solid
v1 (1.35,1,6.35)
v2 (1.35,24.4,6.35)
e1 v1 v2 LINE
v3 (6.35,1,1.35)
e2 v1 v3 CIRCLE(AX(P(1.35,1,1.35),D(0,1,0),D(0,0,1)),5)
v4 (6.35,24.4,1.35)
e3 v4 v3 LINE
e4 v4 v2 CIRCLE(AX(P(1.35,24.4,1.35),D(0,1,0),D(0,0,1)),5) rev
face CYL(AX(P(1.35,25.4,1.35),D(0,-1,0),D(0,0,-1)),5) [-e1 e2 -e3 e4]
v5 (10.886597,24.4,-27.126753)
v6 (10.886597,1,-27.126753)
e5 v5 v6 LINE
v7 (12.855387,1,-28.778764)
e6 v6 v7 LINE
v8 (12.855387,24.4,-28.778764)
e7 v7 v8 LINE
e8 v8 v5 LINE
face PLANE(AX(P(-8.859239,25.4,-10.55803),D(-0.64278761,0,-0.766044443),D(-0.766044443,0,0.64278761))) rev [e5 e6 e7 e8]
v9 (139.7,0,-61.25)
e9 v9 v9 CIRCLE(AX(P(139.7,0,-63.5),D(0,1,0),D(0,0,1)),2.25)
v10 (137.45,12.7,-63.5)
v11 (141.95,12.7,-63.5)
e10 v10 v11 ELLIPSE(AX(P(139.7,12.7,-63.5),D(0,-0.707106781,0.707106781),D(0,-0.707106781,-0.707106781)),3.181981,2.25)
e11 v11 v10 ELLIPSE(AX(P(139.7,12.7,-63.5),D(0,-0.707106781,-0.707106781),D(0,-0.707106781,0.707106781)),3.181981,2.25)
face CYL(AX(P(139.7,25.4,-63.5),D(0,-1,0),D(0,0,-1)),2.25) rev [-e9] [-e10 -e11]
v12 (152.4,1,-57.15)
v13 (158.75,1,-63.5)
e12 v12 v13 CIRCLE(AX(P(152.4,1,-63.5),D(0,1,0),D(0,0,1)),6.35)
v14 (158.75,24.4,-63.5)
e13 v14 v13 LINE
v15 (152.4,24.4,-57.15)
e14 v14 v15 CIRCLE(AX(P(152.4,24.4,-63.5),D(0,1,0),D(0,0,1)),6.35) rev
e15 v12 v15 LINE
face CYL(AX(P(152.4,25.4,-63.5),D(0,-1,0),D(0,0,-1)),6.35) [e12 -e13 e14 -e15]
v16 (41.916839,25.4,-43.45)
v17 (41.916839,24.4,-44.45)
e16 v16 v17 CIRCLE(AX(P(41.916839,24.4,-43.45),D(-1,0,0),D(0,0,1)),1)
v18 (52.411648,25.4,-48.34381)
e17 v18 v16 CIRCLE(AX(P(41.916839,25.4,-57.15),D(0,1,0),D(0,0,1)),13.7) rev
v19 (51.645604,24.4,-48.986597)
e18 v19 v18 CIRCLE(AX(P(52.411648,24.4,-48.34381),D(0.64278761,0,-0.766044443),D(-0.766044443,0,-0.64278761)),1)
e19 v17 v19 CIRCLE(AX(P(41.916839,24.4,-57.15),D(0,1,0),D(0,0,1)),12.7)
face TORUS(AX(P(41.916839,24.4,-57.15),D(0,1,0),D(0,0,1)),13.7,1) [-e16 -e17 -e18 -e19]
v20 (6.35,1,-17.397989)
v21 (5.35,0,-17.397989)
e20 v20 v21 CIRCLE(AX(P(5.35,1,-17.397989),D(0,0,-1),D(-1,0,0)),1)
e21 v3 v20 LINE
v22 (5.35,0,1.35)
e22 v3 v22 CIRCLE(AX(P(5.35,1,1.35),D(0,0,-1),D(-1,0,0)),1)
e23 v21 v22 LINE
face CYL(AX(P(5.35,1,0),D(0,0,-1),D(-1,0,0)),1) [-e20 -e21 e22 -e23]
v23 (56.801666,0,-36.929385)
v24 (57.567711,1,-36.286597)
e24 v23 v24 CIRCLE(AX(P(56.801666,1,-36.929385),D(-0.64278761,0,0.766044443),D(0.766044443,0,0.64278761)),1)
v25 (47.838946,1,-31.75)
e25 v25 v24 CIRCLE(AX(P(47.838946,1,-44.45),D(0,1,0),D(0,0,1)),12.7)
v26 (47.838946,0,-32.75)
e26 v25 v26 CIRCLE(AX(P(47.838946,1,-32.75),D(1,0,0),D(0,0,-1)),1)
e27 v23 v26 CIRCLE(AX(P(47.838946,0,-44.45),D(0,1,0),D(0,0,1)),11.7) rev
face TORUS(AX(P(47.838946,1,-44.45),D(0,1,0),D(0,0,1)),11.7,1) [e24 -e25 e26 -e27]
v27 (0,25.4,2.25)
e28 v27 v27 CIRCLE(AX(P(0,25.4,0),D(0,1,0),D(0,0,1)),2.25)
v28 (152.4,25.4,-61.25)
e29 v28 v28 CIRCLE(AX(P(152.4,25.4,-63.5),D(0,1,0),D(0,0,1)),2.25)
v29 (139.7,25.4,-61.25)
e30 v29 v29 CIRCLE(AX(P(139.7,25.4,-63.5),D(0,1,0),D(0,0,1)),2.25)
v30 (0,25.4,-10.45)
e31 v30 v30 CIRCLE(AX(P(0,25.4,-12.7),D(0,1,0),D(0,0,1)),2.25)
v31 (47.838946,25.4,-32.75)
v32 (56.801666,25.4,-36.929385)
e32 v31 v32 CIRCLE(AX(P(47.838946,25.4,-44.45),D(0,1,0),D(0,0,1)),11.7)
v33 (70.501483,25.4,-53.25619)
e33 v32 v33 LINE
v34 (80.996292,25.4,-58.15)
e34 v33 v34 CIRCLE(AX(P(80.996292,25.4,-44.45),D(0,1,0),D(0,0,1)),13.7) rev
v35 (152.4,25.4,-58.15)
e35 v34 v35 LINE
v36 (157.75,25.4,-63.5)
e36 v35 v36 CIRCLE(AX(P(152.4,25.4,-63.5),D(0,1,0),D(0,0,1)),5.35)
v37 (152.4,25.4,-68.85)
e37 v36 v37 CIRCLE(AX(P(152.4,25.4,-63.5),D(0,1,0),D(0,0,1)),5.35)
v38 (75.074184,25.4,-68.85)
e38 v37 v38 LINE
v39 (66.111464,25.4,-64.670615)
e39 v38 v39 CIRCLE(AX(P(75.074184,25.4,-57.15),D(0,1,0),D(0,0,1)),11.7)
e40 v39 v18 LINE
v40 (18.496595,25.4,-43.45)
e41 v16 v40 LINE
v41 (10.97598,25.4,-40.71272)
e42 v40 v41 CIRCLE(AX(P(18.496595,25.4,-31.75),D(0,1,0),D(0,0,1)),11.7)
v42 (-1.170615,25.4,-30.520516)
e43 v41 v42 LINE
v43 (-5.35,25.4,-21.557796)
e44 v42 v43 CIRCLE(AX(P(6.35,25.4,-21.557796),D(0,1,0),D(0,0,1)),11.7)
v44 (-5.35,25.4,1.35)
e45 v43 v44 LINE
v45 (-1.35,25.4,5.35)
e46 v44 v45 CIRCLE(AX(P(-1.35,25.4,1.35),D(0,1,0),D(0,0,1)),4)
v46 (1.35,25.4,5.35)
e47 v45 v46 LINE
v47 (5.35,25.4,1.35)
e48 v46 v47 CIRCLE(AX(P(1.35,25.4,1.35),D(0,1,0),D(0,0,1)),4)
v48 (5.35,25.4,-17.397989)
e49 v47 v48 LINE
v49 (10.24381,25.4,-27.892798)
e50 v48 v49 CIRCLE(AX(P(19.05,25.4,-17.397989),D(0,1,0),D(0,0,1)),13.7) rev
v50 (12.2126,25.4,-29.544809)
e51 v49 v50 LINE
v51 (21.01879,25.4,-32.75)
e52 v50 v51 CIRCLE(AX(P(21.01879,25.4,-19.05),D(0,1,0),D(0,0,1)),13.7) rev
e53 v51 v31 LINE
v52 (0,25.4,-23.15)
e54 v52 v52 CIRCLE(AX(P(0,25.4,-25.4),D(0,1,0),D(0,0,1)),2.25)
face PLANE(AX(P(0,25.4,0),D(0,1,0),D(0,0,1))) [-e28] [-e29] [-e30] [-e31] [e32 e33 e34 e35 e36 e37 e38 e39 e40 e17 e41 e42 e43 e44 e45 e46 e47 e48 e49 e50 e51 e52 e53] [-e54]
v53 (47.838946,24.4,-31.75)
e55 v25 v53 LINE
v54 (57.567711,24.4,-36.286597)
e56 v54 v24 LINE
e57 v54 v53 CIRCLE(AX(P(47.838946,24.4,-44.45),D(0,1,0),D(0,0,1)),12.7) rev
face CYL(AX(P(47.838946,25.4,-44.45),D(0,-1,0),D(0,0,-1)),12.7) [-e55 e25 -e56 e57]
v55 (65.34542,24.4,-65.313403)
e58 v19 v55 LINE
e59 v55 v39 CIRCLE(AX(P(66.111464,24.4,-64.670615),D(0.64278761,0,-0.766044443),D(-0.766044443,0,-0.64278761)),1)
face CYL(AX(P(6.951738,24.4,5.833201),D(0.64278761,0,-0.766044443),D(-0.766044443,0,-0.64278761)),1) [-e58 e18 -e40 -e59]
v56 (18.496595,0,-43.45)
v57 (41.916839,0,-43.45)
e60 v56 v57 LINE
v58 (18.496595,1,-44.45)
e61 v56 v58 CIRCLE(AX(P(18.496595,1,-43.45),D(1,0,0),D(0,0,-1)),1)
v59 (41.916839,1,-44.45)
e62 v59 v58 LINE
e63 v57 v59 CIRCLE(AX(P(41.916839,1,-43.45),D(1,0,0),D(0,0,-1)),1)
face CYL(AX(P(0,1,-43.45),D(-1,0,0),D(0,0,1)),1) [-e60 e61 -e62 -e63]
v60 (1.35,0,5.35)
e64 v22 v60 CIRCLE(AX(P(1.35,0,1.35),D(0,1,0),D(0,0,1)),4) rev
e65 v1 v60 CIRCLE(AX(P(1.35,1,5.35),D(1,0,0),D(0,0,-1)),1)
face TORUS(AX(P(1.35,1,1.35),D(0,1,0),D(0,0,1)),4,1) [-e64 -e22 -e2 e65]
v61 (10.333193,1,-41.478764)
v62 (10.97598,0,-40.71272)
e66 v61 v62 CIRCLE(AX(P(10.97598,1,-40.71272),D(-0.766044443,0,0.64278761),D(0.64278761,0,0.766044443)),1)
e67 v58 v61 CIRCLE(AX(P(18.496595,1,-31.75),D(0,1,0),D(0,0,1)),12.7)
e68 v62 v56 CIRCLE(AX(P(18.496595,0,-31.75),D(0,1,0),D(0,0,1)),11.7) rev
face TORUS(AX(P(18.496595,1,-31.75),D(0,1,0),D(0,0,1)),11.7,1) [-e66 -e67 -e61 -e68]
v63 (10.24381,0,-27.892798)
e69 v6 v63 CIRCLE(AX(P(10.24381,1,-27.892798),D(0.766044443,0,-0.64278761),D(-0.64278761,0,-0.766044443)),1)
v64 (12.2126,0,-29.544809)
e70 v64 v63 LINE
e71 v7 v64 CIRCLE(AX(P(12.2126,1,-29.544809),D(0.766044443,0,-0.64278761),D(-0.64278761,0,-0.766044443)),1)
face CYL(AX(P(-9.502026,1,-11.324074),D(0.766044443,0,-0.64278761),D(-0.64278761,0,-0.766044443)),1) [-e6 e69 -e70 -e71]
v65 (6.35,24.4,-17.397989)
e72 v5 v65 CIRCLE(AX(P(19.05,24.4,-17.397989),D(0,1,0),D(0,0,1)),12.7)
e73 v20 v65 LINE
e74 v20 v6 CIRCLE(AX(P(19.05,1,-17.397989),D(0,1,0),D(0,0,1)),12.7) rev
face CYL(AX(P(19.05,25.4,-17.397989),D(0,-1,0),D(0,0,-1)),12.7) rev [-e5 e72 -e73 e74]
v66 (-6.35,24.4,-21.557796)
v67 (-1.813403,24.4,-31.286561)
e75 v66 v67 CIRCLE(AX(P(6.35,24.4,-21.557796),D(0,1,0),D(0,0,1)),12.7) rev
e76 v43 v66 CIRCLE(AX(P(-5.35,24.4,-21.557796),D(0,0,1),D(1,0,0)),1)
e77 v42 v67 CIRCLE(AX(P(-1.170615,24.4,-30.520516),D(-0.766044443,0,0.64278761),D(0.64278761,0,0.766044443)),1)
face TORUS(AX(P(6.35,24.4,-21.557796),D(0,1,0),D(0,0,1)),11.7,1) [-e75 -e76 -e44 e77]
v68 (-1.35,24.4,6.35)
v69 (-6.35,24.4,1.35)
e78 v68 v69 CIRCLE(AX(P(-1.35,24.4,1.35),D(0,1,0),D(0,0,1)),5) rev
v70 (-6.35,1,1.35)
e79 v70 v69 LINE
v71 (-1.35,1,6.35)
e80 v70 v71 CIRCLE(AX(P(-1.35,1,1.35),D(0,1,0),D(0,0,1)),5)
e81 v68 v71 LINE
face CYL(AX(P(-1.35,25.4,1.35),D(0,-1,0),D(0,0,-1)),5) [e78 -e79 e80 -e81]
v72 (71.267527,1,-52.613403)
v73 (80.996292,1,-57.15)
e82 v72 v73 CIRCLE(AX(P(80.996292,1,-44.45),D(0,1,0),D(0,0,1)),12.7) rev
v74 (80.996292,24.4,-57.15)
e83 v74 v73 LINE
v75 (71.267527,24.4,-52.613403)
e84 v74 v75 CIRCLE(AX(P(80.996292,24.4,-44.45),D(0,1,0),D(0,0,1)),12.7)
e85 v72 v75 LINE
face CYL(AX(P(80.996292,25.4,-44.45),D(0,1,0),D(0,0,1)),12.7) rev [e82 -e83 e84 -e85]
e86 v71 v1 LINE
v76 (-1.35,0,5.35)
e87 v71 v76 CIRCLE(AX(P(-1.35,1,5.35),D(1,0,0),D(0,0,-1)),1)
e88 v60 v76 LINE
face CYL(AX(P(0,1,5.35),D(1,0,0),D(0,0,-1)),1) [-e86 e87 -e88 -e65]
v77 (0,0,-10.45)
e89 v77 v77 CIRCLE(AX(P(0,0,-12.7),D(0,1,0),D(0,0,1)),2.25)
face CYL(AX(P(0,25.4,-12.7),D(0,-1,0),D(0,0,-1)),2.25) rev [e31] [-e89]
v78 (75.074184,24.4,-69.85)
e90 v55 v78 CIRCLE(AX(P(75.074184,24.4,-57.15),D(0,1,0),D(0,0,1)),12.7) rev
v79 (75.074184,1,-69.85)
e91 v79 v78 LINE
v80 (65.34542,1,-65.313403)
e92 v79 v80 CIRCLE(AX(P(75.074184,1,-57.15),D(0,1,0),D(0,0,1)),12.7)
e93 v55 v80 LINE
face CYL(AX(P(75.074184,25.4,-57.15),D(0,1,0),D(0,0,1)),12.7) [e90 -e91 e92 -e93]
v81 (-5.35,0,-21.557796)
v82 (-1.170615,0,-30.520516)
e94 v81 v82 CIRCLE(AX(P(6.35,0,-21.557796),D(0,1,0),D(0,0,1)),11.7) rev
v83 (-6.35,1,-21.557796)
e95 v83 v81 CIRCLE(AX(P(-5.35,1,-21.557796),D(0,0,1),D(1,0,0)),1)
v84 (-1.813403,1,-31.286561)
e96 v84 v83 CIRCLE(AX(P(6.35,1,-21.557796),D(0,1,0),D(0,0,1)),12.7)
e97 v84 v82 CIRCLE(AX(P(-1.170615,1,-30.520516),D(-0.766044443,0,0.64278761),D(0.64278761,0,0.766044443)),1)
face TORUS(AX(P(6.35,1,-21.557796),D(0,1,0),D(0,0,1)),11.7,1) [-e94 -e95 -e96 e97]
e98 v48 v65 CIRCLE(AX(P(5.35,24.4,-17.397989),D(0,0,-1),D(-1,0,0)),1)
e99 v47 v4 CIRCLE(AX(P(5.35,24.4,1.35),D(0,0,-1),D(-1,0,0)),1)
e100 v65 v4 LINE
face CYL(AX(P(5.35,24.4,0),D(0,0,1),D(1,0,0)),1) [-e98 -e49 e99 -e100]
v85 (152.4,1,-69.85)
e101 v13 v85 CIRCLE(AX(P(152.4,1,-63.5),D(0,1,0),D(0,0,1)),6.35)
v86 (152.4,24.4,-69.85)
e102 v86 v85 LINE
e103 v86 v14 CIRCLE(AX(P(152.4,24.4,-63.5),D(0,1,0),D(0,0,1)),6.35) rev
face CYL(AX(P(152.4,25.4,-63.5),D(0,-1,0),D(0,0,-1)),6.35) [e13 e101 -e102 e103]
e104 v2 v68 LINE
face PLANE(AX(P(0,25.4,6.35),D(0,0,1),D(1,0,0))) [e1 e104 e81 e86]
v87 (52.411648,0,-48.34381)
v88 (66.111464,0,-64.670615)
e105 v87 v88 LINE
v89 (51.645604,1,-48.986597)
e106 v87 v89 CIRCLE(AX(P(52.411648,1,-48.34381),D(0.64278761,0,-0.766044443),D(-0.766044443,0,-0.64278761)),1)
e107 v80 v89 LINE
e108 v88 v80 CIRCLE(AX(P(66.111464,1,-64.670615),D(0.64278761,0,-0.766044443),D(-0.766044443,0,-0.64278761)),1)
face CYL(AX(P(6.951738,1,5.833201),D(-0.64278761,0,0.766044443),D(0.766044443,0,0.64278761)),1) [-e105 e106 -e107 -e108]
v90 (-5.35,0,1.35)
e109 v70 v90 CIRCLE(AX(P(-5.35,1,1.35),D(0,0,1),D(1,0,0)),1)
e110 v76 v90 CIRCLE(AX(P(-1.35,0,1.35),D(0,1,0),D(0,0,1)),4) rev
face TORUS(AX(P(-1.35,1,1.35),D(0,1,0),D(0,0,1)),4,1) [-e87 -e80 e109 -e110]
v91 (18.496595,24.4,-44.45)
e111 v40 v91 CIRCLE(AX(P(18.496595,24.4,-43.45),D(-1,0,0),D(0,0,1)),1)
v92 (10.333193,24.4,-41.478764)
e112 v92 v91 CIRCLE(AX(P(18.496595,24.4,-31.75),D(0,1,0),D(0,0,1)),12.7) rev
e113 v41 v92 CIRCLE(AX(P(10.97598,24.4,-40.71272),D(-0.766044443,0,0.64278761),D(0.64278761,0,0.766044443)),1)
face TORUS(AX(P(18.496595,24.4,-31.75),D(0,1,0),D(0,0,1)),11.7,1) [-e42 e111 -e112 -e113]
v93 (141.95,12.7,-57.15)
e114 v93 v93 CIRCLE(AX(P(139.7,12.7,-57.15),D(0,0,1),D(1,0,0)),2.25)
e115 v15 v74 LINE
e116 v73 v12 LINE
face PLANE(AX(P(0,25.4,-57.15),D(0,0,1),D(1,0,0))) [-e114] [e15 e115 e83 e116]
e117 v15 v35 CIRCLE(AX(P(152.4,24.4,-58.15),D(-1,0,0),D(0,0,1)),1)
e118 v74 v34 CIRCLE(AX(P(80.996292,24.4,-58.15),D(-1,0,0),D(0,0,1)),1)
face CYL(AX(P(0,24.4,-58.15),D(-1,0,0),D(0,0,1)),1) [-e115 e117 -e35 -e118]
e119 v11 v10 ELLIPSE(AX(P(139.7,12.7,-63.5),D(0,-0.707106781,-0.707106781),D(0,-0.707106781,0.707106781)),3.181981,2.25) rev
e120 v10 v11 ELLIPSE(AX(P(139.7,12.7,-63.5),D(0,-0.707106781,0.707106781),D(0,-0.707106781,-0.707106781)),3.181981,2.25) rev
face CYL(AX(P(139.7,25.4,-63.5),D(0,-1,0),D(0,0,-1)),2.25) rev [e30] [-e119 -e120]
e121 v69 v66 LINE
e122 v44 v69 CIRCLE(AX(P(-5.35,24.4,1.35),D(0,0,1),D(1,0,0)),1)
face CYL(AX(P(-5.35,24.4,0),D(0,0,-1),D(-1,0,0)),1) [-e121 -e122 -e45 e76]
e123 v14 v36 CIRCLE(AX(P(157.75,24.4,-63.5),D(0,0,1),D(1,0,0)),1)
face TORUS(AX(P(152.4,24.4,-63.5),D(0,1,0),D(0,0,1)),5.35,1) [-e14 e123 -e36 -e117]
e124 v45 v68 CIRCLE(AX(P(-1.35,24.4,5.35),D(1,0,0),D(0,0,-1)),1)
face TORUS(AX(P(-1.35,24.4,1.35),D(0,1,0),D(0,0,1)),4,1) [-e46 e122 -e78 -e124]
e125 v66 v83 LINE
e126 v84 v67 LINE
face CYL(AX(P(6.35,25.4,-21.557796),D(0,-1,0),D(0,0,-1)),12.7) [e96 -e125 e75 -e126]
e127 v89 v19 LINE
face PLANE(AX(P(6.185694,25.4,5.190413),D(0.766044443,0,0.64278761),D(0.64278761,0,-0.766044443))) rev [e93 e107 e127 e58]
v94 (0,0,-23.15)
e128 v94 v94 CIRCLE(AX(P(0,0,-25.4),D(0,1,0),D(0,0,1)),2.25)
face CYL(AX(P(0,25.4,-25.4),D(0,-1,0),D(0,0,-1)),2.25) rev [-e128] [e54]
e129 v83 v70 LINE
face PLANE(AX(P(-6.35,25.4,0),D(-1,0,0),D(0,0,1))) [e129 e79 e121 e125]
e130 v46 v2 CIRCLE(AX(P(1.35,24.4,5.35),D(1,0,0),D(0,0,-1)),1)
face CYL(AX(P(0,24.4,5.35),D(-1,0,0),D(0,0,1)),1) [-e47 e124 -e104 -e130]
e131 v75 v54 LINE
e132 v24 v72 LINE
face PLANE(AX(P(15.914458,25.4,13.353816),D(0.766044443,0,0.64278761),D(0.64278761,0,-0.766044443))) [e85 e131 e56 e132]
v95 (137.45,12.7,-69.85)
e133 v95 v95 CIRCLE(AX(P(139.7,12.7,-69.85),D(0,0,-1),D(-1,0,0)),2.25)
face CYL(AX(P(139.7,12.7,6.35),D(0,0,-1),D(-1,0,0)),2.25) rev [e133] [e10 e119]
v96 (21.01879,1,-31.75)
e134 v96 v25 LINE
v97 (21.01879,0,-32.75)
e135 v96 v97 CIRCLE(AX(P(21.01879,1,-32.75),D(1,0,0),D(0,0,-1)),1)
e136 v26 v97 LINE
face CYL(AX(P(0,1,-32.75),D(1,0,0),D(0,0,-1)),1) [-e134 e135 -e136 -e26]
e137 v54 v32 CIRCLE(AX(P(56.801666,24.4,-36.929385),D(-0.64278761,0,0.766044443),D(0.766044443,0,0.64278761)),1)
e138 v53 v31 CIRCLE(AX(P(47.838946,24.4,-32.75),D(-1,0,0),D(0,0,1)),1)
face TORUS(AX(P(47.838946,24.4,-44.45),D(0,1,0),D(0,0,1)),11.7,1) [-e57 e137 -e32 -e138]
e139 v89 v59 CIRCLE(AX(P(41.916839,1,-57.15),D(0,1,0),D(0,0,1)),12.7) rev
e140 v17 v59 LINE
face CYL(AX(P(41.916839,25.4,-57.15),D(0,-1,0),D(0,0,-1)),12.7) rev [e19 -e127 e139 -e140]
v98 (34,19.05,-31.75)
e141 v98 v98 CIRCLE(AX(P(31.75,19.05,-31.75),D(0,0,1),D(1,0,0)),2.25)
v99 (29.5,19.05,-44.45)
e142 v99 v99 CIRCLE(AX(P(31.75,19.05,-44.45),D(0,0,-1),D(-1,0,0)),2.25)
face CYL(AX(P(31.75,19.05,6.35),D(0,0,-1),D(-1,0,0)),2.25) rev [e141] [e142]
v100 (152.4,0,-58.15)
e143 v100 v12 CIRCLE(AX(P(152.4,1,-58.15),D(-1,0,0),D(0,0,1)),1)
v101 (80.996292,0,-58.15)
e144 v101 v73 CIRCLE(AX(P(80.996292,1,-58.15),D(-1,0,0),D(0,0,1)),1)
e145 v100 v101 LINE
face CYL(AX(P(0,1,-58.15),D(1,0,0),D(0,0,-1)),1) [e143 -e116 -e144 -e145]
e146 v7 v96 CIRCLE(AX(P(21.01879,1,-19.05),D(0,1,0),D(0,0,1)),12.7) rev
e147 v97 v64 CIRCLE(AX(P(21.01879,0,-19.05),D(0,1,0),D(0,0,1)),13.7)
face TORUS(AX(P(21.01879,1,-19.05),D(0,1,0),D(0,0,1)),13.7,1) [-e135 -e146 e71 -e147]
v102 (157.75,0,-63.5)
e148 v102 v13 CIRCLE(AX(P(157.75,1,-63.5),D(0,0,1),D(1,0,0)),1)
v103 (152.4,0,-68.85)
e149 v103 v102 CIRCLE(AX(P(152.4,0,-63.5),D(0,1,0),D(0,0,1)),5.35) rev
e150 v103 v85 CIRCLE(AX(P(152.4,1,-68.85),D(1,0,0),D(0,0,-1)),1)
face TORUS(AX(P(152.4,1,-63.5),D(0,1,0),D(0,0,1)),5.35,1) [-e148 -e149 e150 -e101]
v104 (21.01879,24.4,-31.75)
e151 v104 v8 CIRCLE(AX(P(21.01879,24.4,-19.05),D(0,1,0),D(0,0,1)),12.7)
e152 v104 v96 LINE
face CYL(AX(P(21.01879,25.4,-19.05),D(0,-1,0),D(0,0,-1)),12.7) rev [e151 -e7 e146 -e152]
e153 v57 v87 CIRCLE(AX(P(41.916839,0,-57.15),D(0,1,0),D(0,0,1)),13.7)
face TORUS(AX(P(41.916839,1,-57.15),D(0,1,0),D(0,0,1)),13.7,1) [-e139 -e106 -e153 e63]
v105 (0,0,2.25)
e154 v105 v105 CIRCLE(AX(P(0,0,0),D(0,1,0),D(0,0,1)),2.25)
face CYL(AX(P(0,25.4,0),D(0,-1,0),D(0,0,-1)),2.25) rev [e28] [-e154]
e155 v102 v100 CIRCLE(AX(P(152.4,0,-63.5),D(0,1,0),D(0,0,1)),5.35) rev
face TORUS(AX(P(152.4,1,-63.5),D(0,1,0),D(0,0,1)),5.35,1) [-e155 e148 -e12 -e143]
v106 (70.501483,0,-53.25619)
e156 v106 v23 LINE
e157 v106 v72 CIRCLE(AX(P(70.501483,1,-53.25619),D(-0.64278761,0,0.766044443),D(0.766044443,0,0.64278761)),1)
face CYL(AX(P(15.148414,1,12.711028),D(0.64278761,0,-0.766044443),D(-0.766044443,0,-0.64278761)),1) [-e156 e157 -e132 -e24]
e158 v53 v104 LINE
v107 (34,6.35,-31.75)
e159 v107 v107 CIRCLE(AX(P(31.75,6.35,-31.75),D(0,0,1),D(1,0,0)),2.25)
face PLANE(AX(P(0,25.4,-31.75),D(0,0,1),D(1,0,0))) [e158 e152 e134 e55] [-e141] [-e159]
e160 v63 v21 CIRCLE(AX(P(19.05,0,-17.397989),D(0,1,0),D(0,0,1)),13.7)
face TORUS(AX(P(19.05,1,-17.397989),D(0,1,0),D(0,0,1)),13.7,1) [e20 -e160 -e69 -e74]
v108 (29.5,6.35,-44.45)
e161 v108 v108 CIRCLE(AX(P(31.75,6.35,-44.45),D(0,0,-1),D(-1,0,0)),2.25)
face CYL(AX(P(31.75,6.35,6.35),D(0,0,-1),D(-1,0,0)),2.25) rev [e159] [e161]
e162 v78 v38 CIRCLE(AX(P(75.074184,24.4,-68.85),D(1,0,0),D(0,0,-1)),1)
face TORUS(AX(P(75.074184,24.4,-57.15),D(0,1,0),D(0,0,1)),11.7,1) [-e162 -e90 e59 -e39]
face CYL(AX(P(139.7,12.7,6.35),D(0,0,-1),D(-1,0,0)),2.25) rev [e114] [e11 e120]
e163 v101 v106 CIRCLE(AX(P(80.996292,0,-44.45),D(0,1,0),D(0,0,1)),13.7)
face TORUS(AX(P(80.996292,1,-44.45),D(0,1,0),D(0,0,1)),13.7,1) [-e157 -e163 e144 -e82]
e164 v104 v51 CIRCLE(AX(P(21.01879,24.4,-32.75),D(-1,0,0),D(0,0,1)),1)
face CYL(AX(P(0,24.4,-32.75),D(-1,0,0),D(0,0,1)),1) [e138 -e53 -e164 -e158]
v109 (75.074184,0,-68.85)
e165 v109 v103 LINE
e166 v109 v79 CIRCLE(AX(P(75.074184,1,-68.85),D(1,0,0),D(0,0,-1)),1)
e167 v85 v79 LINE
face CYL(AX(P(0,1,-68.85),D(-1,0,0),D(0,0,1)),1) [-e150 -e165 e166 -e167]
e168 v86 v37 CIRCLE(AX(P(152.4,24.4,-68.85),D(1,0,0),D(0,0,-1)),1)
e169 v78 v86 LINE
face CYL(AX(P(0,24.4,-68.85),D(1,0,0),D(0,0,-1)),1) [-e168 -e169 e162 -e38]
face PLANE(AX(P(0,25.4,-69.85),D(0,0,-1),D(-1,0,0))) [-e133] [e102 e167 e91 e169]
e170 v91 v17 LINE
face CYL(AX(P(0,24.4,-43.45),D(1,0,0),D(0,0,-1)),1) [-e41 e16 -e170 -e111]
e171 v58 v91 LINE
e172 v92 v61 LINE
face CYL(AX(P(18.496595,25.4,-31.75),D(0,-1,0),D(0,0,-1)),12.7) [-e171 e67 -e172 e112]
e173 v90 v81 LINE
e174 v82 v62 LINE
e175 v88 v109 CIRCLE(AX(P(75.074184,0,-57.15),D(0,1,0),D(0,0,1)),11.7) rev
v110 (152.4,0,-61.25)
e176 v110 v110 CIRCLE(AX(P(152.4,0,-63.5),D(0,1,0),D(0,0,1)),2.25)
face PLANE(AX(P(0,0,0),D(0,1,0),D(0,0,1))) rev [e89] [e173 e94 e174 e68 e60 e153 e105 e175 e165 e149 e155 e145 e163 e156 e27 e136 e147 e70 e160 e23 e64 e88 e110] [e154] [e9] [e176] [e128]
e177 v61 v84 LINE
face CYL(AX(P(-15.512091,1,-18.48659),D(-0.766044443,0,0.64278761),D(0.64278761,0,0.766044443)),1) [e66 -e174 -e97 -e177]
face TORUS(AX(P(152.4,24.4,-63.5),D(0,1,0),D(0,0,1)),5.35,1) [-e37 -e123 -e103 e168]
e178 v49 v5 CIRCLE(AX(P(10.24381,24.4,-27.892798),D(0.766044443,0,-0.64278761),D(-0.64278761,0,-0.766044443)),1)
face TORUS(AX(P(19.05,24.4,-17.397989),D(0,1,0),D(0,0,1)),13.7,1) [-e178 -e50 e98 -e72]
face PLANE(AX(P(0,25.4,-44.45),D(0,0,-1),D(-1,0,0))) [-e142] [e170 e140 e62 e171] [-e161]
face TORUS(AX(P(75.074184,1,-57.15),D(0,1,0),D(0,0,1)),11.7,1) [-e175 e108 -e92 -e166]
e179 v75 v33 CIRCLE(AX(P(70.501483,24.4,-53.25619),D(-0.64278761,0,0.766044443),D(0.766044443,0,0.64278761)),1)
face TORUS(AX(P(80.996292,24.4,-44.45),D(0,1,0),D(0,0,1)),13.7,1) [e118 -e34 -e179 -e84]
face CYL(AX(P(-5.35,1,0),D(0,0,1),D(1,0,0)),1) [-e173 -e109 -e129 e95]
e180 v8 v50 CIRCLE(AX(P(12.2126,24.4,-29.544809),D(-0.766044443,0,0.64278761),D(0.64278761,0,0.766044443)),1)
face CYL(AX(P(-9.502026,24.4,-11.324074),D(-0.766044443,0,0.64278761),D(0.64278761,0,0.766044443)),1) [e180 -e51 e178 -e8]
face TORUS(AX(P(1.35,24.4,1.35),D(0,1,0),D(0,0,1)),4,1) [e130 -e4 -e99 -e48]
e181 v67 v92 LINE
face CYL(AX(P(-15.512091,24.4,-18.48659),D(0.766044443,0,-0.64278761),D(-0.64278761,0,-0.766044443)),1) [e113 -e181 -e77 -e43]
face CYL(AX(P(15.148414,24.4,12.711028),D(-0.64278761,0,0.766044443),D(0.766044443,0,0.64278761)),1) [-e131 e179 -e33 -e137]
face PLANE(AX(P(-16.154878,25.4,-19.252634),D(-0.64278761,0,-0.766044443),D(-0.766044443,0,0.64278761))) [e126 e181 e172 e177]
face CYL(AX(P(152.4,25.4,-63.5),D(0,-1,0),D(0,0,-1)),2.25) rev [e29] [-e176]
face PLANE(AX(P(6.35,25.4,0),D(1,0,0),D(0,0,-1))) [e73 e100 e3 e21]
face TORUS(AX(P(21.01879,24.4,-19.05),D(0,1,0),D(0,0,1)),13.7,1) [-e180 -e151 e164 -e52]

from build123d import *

# Parameters (mm, degrees)
SKETCH1_R           = 2.25
BOSS_EXTRUDE1_DEPTH = 25.4
FILLET2_R           = 5
SKETCH3_R           = 2.25
CUT_EXTRUDE2_DEPTH  = 178.913356722
FILLET4_R           = 12.7
FILLET6_R           = 6.35
FILLET5_R           = 1


with BuildPart() as part:
    # Sketch1 → Boss-Extrude1 (new body)
    with BuildSketch(Plane(origin=(0, 0, 0), x_dir=(1, 0, 0), z_dir=(0, 1, 0))):
        Polygon((53.761053629, 31.75), (75.074184261, 57.15), (158.75, 57.15), (158.75, 69.85), (69.152077003, 69.85), (47.838946371, 44.45), (13.874173221, 44.45), (-6.35, 27.479903709), (-6.35, -6.35), (6.35, -6.35), (6.35, 23.320096291), (16.39636803, 31.75), align=None)
        with Locations(Location((0, 0, 0), (0, 0, 270))):
            Circle(SKETCH1_R, mode=Mode.SUBTRACT)
        with Locations(Location((0, 12.7, 0), (0, 0, 270))):
            Circle(SKETCH1_R, mode=Mode.SUBTRACT)
        with Locations(Location((0, 25.4, 0), (0, 0, 270))):
            Circle(SKETCH1_R, mode=Mode.SUBTRACT)
        with Locations(Location((152.4, 63.5, 0), (0, 0, 270))):
            Circle(SKETCH1_R, mode=Mode.SUBTRACT)
        with Locations(Location((139.7, 63.5, 0), (0, 0, 270))):
            Circle(SKETCH1_R, mode=Mode.SUBTRACT)
    extrude(amount=BOSS_EXTRUDE1_DEPTH)

    # Fillet2
    fillet2_edges = [part.edges().sort_by_distance(p)[0] for p in [
        (6.35, 12.7, 6.35),
        (-6.35, 12.7, 6.35),
    ]]
    fillet(fillet2_edges, radius=FILLET2_R)

    # Sketch3 → Cut-Extrude2 (cut, through all)
    with BuildSketch(Plane(origin=(0, 0, -69.85), x_dir=(-1, 0, 0), z_dir=(0, 0, -1))):
        with Locations((-31.75, 6.35)):
            Circle(SKETCH3_R)
        with Locations((-31.75, 19.05)):
            Circle(SKETCH3_R)
        with Locations(Location((-139.7, 12.7, 0), (0, 0, 180))):
            Circle(SKETCH3_R)
    extrude(amount=-CUT_EXTRUDE2_DEPTH, mode=Mode.SUBTRACT)

    # Fillet4
    fillet4_edges = [part.edges().sort_by_distance(p)[0] for p in [
        (-6.35, 12.7, -27.479903709),
        (13.874173221, 12.7, -44.45),
        (47.838946371, 12.7, -44.45),
        (69.152077003, 12.7, -69.85),
        (75.074184261, 12.7, -57.15),
        (53.761053629, 12.7, -31.75),
        (16.39636803, 12.7, -31.75),
        (6.35, 12.7, -23.320096291),
    ]]
    fillet(fillet4_edges, radius=FILLET4_R)

    # Fillet6
    fillet6_edges = [part.edges().sort_by_distance(p)[0] for p in [
        (158.75, 12.7, -69.85),
        (158.75, 12.7, -57.15),
    ]]
    fillet(fillet6_edges, radius=FILLET6_R - 0.0001)  # a hair under: the kernel refuses the full size

    # Fillet5
    fillet5_edges = [part.edges().sort_by_distance(p)[0] for p in [
        (113.737142131, 25.4, -69.85),
        (6.35, 25.4, -8.023994516),
        (11.87099236, 25.4, -27.952758944),
        (34.428868188, 25.4, -31.75),
        (64.417618945, 25.4, -44.45),
        (30.206717154, 25.4, -44.45),
        (4.259894955, 25.4, -36.382662653),
        (-5.160108895, 25.4, -26.925048375),
        (14.152939376, 25.4, -43.684096284),
        (53.206198295, 25.4, -32.939891105),
        (69.706932337, 25.4, -68.660108895),
        (47.284091036, 0, -45.639891105),
        (47.284091036, 25.4, -45.639891105),
        (75.629039596, 0, -55.960108895),
        (75.629039596, 25.4, -55.960108895),
        (16.675134185, 0, -30.984096284),
        (16.675134185, 25.4, -30.984096284),
        (7.539891105, 0, -22.765240957),
        (7.539891105, 25.4, -22.765240957),
        (116.69819576, 0, -57.15),
        (156.89015735, 0, -59.00984265),
        (156.89015735, 0, -67.99015735),
        (116.69819576, 25.4, -57.15),
        (156.89015735, 25.4, -59.00984265),
        (156.89015735, 25.4, -67.99015735),
        (0, 0, 6.35),
        (0, 25.4, 6.35),
        (-6.35, 0, -10.103898225),
        (4.885533906, 0, 4.885533906),
        (-4.885533906, 0, 4.885533906),
        (-6.35, 25.4, -10.103898225),
        (4.885533906, 25.4, 4.885533906),
        (-4.885533906, 25.4, 4.885533906),
        (58.495511687, 0, -57.15),
        (58.495511687, 25.4, -57.15),
        (4.259894955, 0, -36.382662653),
        (30.206717154, 0, -44.45),
        (113.737142131, 0, -69.85),
        (64.417618945, 0, -44.45),
        (34.428868188, 0, -31.75),
        (11.87099236, 0, -27.952758944),
        (6.35, 0, -8.023994516),
        (-5.160108895, 0, -26.925048375),
        (14.152939376, 0, -43.684096284),
        (53.206198295, 0, -32.939891105),
        (69.706932337, 0, -68.660108895),
    ]]
    fillet(fillet5_edges, radius=FILLET5_R)


solid = part.part
